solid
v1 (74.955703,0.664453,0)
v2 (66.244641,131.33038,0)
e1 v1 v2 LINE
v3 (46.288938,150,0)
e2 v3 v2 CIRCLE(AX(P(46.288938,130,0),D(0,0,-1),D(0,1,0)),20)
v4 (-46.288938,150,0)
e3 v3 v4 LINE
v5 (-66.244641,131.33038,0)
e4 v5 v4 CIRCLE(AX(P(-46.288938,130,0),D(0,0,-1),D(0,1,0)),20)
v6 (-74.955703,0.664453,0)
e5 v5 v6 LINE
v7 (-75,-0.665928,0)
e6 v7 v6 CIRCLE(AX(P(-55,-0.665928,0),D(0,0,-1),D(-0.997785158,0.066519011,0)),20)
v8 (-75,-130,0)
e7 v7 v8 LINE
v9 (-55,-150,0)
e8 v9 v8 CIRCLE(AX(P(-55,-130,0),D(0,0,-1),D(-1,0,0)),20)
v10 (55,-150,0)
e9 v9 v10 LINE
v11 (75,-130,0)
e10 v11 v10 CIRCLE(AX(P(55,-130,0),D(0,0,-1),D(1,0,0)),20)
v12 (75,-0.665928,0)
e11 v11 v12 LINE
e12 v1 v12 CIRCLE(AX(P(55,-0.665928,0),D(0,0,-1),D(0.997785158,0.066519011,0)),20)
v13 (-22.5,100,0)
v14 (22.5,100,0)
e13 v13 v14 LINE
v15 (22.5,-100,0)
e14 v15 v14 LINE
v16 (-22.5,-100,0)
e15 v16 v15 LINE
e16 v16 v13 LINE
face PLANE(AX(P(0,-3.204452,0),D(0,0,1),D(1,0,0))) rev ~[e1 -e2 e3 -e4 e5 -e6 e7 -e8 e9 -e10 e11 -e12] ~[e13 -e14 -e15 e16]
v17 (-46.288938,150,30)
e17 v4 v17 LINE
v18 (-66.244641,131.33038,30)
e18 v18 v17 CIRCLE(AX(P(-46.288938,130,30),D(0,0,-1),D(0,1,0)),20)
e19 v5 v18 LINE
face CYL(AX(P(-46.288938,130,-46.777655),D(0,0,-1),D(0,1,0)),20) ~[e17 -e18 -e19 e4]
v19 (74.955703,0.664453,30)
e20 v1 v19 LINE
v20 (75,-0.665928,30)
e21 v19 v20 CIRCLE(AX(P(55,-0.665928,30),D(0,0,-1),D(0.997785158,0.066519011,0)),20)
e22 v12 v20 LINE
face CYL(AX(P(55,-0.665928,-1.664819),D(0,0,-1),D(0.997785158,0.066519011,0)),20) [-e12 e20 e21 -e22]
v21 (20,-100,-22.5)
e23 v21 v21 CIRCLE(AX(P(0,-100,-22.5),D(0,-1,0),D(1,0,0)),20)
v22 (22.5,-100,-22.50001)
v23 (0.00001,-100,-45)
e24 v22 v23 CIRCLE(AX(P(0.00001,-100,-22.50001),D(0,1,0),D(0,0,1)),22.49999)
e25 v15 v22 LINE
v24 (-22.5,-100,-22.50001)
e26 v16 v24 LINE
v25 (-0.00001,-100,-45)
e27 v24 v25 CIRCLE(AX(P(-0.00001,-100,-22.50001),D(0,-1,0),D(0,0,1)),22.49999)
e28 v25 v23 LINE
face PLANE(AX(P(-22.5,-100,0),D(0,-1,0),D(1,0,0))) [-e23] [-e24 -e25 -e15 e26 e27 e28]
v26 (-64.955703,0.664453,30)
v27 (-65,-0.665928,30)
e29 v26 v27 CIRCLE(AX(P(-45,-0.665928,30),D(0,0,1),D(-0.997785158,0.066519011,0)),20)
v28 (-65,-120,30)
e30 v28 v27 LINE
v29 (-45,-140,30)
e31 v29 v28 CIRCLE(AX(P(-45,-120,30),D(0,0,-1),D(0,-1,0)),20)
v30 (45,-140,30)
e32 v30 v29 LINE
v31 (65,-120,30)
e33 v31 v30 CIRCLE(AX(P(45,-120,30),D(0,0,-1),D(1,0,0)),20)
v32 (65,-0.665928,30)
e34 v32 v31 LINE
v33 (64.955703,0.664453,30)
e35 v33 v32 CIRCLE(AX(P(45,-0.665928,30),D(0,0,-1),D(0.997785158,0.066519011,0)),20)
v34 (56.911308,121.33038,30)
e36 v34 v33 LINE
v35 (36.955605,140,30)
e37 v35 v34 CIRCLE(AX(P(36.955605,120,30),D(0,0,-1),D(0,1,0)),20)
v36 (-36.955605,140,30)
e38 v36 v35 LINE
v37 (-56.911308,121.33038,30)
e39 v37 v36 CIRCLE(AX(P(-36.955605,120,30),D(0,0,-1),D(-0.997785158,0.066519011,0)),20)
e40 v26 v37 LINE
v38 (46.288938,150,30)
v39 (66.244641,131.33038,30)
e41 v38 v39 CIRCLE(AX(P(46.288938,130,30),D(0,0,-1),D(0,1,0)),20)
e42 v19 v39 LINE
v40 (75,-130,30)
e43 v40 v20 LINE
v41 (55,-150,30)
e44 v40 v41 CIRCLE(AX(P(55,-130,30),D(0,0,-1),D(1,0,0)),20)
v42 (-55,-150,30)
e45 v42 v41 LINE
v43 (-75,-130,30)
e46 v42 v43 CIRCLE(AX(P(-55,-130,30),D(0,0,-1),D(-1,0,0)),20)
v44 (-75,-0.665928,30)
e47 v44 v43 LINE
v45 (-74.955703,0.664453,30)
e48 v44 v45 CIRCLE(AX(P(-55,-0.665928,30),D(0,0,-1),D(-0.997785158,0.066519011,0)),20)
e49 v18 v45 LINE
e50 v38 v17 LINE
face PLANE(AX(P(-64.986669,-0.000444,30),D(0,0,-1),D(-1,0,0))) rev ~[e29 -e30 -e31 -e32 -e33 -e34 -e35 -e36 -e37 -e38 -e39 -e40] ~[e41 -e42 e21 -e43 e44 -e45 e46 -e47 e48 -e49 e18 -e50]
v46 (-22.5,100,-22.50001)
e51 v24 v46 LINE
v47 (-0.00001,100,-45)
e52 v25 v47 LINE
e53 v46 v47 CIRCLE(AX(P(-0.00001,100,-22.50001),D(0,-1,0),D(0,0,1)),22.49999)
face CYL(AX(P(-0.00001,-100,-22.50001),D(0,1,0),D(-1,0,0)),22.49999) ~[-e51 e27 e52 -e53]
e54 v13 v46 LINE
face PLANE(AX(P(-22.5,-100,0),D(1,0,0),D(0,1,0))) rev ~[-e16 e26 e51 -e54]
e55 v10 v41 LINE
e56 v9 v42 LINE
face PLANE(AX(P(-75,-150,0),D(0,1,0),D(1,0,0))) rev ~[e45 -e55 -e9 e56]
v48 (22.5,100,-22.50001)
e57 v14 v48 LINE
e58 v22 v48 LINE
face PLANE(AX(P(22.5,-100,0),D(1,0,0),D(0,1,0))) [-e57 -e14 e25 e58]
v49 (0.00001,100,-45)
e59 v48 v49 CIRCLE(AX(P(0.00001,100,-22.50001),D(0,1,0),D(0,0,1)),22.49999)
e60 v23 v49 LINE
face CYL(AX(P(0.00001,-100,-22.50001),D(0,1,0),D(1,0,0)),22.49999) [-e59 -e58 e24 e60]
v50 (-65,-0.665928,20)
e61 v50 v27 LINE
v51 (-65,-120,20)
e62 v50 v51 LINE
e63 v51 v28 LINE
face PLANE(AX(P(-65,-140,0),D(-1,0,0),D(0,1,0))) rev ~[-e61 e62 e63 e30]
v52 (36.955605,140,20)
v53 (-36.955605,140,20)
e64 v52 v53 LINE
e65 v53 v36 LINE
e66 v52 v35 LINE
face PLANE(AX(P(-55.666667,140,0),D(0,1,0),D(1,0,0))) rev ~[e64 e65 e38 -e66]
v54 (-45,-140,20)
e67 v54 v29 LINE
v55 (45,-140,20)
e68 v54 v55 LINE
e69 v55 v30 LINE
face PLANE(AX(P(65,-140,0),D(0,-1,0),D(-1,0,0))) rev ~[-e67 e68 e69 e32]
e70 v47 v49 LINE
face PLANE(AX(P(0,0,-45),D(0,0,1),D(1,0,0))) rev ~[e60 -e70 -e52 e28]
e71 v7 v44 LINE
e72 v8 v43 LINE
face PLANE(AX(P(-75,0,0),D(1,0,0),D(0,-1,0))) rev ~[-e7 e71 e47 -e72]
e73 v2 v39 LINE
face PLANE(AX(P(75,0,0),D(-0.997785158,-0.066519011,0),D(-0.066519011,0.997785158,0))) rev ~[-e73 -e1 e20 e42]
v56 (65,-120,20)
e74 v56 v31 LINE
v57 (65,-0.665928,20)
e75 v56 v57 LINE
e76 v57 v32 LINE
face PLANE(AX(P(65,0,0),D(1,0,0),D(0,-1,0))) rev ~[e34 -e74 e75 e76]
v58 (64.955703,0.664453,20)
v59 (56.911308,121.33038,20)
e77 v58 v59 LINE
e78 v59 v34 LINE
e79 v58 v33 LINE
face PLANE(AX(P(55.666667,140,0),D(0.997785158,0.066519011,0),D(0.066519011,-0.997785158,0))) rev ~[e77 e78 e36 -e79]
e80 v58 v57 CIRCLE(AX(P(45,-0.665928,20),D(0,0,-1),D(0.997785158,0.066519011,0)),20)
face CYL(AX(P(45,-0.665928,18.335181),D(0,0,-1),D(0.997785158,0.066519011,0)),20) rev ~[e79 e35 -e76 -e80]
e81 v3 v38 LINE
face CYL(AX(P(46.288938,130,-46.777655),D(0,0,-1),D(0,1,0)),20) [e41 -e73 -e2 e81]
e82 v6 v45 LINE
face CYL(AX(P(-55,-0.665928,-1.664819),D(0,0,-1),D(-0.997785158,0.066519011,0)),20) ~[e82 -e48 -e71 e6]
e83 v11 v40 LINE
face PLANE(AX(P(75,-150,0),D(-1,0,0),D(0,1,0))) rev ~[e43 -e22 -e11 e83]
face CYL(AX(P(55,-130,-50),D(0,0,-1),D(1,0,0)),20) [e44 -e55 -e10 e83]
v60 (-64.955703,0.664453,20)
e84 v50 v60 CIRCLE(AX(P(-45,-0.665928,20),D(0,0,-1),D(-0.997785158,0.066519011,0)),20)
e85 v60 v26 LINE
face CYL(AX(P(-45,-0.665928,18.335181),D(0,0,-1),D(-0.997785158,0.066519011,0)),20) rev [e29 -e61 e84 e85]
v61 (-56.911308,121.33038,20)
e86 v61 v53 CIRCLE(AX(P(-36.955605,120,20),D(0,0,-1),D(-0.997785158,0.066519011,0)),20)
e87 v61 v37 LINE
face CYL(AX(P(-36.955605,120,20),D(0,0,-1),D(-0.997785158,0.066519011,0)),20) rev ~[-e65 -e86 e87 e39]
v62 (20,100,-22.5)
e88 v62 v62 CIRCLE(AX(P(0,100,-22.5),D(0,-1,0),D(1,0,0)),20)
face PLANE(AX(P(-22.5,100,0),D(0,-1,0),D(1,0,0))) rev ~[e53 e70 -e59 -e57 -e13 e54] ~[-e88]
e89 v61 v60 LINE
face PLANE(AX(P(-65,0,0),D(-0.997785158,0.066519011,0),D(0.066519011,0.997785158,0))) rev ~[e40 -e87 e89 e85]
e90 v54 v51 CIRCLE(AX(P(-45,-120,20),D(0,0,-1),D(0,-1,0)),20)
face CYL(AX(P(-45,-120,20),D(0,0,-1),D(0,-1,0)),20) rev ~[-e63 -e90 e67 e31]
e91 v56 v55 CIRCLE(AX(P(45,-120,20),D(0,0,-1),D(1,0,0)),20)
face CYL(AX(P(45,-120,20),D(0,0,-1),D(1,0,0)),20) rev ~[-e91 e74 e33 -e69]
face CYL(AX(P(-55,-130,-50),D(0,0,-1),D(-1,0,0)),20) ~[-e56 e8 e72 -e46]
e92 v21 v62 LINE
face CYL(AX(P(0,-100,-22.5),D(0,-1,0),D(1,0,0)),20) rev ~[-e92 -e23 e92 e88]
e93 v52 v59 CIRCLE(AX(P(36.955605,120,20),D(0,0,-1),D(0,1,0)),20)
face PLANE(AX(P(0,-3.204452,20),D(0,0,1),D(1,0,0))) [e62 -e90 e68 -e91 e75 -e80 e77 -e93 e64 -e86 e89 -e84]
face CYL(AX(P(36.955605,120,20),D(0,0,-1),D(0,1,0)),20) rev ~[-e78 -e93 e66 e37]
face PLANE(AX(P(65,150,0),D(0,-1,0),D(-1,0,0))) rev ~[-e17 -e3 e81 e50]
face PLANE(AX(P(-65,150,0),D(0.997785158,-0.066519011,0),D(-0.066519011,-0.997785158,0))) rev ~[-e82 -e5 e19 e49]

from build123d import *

# Parameters (mm, degrees)
F1_DEPTH    = 30
F2_DEPTH    = 20
F3_T1_DEPTH = 10
F3_T3_DEPTH = 11.6648189186
F3_T5_DEPTH = 130
F3_T7_DEPTH = 123.5553091892
F3_T9_DEPTH = 33.3296378373
F5_W        = 45
F5_H        = 200
F6_DEPTH    = 45
F7_R        = 20
F8_DEPTH    = 200
F9_R        = 22.49999


# Not quite as in the source:
# - a fillet or chamfer that OpenCascade refuses, or shapes differently, is made with other operations: its cross-section is extruded or revolved along the edge and cut away or added
# - two fillets or chamfers of one size are made in one step
# - a fillet or chamfer is up to 0.001 mm smaller than in the source, because OpenCascade refuses the exact size


with BuildPart() as f1:
    # F0 (on Top) → F1 (new body)
    with BuildSketch(Plane.XY):
        Polygon((65, 150), (-65, 150), (-75, 0), (-75, -150), (75, -150), (75, 0), align=None)
        Polygon((-65, 0), (-55.6666666667, 140), (55.6666666667, 140), (65, 0), (65, -140), (-65, -140), align=None, mode=Mode.SUBTRACT)
    extrude(amount=F1_DEPTH)

    # F0 (on Top) → F2 (join)
    with BuildSketch(Plane.XY):
        Polygon((55.6666666667, 140), (-55.6666666667, 140), (-65, 0), (-65, -140), (65, -140), (65, 0), align=None)
    extrude(amount=F2_DEPTH)

    # F3: fillet of radius 20 on 12 edges, made by hand

    # F3_s2 → F3_t1 (join)
    with BuildSketch(Plane.XY.offset(20)):
        with BuildLine():
            ThreePointArc((-56.911307986, 121.3303802105), (-50.6192865397, 134.6049238993), (-36.9556048288, 140))
            Line((-36.9556048288, 140), (-55.6666666667, 140))
            Line((-55.6666666667, 140), (-56.911307986, 121.3303802105))
        make_face()
        with BuildLine():
            ThreePointArc((36.9556048288, 140), (50.6192865397, 134.6049238993), (56.911307986, 121.3303802105))
            Line((56.911307986, 121.3303802105), (55.6666666667, 140))
            Line((55.6666666667, 140), (36.9556048288, 140))
        make_face()
        with BuildLine():
            ThreePointArc((65, -120), (59.1421356237, -134.1421356237), (45, -140))
            Line((45, -140), (65, -140))
            Line((65, -140), (65, -120))
        make_face()
        with BuildLine():
            ThreePointArc((-45, -140), (-59.1421356237, -134.1421356237), (-65, -120))
            Line((-65, -120), (-65, -140))
            Line((-65, -140), (-45, -140))
        make_face()
    extrude(amount=F3_T1_DEPTH)

    # F3_s4 → F3_t3 (join)
    with BuildSketch(Plane.XY.offset(18.3351810814)):
        with BuildLine():
            ThreePointArc((-64.9557031571, 0.664452643), (-64.9889227216, -0.0003688333), (-65, -0.6659275675))
            Line((-65, -0.6659275675), (-65, 0))
            Line((-65, 0), (-64.9557031571, 0.664452643))
        make_face()
        with BuildLine():
            ThreePointArc((64.9557031571, 0.664452643), (64.9889227216, -0.0003688333), (65, -0.6659275675))
            Line((65, -0.6659275675), (65, 0))
            Line((65, 0), (64.9557031571, 0.664452643))
        make_face()
    extrude(amount=F3_T3_DEPTH)

    # F3_s6 → F3_t5 (cut)
    with BuildSketch(Plane.XY.offset(-50)):
        with BuildLine():
            ThreePointArc((75, -130), (69.1421356237, -144.1421356237), (55, -150))
            Line((55, -150), (75, -150))
            Line((75, -150), (75, -130))
        make_face()
        with BuildLine():
            ThreePointArc((-75, -130), (-69.1421356237, -144.1421356237), (-55, -150))
            Line((-55, -150), (-75, -150))
            Line((-75, -150), (-75, -130))
        make_face()
    extrude(amount=F3_T5_DEPTH, mode=Mode.SUBTRACT)

    # F3_s8 → F3_t7 (cut)
    with BuildSketch(Plane.XY.offset(-46.7776545946)):
        with BuildLine():
            ThreePointArc((46.2889381622, 150), (59.952619873, 144.6049238993), (66.2446413193, 131.3303802105))
            Line((66.2446413193, 131.3303802105), (65, 150))
            Line((65, 150), (46.2889381622, 150))
        make_face()
        with BuildLine():
            ThreePointArc((-46.2889381622, 150), (-59.952619873, 144.6049238993), (-66.2446413193, 131.3303802105))
            Line((-66.2446413193, 131.3303802105), (-65, 150))
            Line((-65, 150), (-46.2889381622, 150))
        make_face()
    extrude(amount=F3_T7_DEPTH, mode=Mode.SUBTRACT)

    # F3_s10 → F3_t9 (cut)
    with BuildSketch(Plane.XY.offset(-1.6648189186)):
        with BuildLine():
            ThreePointArc((74.9557031571, 0.664452643), (74.9889227216, -0.0003688333), (75, -0.6659275675))
            Line((75, -0.6659275675), (75, 0))
            Line((75, 0), (74.9557031571, 0.664452643))
        make_face()
        with BuildLine():
            ThreePointArc((-74.9557031571, 0.664452643), (-74.9889227216, -0.0003688333), (-75, -0.6659275675))
            Line((-75, -0.6659275675), (-75, 0))
            Line((-75, 0), (-74.9557031571, 0.664452643))
        make_face()
    extrude(amount=F3_T9_DEPTH, mode=Mode.SUBTRACT)

    # F5 (on face) → F6 (join)
    with BuildSketch(Plane.XY):
        Rectangle(F5_W, F5_H)
    extrude(amount=-F6_DEPTH)

    # F7 (on face) → F8 (cut, through all)
    with BuildSketch(Plane.XZ.offset(100)):
        with Locations((0, -22.5)):
            Circle(F7_R)
    extrude(amount=-F8_DEPTH, mode=Mode.SUBTRACT)

    # F9 (radius 22.5 in the source; OpenCascade refuses exactly that, so slightly less here)
    f9_edges = [f1.edges().sort_by_distance(p)[0] for p in [
        (-22.5, 0, -45),
        (22.5, 0, -45),
    ]]
    fillet(f9_edges, radius=F9_R)


solid = f1.part
